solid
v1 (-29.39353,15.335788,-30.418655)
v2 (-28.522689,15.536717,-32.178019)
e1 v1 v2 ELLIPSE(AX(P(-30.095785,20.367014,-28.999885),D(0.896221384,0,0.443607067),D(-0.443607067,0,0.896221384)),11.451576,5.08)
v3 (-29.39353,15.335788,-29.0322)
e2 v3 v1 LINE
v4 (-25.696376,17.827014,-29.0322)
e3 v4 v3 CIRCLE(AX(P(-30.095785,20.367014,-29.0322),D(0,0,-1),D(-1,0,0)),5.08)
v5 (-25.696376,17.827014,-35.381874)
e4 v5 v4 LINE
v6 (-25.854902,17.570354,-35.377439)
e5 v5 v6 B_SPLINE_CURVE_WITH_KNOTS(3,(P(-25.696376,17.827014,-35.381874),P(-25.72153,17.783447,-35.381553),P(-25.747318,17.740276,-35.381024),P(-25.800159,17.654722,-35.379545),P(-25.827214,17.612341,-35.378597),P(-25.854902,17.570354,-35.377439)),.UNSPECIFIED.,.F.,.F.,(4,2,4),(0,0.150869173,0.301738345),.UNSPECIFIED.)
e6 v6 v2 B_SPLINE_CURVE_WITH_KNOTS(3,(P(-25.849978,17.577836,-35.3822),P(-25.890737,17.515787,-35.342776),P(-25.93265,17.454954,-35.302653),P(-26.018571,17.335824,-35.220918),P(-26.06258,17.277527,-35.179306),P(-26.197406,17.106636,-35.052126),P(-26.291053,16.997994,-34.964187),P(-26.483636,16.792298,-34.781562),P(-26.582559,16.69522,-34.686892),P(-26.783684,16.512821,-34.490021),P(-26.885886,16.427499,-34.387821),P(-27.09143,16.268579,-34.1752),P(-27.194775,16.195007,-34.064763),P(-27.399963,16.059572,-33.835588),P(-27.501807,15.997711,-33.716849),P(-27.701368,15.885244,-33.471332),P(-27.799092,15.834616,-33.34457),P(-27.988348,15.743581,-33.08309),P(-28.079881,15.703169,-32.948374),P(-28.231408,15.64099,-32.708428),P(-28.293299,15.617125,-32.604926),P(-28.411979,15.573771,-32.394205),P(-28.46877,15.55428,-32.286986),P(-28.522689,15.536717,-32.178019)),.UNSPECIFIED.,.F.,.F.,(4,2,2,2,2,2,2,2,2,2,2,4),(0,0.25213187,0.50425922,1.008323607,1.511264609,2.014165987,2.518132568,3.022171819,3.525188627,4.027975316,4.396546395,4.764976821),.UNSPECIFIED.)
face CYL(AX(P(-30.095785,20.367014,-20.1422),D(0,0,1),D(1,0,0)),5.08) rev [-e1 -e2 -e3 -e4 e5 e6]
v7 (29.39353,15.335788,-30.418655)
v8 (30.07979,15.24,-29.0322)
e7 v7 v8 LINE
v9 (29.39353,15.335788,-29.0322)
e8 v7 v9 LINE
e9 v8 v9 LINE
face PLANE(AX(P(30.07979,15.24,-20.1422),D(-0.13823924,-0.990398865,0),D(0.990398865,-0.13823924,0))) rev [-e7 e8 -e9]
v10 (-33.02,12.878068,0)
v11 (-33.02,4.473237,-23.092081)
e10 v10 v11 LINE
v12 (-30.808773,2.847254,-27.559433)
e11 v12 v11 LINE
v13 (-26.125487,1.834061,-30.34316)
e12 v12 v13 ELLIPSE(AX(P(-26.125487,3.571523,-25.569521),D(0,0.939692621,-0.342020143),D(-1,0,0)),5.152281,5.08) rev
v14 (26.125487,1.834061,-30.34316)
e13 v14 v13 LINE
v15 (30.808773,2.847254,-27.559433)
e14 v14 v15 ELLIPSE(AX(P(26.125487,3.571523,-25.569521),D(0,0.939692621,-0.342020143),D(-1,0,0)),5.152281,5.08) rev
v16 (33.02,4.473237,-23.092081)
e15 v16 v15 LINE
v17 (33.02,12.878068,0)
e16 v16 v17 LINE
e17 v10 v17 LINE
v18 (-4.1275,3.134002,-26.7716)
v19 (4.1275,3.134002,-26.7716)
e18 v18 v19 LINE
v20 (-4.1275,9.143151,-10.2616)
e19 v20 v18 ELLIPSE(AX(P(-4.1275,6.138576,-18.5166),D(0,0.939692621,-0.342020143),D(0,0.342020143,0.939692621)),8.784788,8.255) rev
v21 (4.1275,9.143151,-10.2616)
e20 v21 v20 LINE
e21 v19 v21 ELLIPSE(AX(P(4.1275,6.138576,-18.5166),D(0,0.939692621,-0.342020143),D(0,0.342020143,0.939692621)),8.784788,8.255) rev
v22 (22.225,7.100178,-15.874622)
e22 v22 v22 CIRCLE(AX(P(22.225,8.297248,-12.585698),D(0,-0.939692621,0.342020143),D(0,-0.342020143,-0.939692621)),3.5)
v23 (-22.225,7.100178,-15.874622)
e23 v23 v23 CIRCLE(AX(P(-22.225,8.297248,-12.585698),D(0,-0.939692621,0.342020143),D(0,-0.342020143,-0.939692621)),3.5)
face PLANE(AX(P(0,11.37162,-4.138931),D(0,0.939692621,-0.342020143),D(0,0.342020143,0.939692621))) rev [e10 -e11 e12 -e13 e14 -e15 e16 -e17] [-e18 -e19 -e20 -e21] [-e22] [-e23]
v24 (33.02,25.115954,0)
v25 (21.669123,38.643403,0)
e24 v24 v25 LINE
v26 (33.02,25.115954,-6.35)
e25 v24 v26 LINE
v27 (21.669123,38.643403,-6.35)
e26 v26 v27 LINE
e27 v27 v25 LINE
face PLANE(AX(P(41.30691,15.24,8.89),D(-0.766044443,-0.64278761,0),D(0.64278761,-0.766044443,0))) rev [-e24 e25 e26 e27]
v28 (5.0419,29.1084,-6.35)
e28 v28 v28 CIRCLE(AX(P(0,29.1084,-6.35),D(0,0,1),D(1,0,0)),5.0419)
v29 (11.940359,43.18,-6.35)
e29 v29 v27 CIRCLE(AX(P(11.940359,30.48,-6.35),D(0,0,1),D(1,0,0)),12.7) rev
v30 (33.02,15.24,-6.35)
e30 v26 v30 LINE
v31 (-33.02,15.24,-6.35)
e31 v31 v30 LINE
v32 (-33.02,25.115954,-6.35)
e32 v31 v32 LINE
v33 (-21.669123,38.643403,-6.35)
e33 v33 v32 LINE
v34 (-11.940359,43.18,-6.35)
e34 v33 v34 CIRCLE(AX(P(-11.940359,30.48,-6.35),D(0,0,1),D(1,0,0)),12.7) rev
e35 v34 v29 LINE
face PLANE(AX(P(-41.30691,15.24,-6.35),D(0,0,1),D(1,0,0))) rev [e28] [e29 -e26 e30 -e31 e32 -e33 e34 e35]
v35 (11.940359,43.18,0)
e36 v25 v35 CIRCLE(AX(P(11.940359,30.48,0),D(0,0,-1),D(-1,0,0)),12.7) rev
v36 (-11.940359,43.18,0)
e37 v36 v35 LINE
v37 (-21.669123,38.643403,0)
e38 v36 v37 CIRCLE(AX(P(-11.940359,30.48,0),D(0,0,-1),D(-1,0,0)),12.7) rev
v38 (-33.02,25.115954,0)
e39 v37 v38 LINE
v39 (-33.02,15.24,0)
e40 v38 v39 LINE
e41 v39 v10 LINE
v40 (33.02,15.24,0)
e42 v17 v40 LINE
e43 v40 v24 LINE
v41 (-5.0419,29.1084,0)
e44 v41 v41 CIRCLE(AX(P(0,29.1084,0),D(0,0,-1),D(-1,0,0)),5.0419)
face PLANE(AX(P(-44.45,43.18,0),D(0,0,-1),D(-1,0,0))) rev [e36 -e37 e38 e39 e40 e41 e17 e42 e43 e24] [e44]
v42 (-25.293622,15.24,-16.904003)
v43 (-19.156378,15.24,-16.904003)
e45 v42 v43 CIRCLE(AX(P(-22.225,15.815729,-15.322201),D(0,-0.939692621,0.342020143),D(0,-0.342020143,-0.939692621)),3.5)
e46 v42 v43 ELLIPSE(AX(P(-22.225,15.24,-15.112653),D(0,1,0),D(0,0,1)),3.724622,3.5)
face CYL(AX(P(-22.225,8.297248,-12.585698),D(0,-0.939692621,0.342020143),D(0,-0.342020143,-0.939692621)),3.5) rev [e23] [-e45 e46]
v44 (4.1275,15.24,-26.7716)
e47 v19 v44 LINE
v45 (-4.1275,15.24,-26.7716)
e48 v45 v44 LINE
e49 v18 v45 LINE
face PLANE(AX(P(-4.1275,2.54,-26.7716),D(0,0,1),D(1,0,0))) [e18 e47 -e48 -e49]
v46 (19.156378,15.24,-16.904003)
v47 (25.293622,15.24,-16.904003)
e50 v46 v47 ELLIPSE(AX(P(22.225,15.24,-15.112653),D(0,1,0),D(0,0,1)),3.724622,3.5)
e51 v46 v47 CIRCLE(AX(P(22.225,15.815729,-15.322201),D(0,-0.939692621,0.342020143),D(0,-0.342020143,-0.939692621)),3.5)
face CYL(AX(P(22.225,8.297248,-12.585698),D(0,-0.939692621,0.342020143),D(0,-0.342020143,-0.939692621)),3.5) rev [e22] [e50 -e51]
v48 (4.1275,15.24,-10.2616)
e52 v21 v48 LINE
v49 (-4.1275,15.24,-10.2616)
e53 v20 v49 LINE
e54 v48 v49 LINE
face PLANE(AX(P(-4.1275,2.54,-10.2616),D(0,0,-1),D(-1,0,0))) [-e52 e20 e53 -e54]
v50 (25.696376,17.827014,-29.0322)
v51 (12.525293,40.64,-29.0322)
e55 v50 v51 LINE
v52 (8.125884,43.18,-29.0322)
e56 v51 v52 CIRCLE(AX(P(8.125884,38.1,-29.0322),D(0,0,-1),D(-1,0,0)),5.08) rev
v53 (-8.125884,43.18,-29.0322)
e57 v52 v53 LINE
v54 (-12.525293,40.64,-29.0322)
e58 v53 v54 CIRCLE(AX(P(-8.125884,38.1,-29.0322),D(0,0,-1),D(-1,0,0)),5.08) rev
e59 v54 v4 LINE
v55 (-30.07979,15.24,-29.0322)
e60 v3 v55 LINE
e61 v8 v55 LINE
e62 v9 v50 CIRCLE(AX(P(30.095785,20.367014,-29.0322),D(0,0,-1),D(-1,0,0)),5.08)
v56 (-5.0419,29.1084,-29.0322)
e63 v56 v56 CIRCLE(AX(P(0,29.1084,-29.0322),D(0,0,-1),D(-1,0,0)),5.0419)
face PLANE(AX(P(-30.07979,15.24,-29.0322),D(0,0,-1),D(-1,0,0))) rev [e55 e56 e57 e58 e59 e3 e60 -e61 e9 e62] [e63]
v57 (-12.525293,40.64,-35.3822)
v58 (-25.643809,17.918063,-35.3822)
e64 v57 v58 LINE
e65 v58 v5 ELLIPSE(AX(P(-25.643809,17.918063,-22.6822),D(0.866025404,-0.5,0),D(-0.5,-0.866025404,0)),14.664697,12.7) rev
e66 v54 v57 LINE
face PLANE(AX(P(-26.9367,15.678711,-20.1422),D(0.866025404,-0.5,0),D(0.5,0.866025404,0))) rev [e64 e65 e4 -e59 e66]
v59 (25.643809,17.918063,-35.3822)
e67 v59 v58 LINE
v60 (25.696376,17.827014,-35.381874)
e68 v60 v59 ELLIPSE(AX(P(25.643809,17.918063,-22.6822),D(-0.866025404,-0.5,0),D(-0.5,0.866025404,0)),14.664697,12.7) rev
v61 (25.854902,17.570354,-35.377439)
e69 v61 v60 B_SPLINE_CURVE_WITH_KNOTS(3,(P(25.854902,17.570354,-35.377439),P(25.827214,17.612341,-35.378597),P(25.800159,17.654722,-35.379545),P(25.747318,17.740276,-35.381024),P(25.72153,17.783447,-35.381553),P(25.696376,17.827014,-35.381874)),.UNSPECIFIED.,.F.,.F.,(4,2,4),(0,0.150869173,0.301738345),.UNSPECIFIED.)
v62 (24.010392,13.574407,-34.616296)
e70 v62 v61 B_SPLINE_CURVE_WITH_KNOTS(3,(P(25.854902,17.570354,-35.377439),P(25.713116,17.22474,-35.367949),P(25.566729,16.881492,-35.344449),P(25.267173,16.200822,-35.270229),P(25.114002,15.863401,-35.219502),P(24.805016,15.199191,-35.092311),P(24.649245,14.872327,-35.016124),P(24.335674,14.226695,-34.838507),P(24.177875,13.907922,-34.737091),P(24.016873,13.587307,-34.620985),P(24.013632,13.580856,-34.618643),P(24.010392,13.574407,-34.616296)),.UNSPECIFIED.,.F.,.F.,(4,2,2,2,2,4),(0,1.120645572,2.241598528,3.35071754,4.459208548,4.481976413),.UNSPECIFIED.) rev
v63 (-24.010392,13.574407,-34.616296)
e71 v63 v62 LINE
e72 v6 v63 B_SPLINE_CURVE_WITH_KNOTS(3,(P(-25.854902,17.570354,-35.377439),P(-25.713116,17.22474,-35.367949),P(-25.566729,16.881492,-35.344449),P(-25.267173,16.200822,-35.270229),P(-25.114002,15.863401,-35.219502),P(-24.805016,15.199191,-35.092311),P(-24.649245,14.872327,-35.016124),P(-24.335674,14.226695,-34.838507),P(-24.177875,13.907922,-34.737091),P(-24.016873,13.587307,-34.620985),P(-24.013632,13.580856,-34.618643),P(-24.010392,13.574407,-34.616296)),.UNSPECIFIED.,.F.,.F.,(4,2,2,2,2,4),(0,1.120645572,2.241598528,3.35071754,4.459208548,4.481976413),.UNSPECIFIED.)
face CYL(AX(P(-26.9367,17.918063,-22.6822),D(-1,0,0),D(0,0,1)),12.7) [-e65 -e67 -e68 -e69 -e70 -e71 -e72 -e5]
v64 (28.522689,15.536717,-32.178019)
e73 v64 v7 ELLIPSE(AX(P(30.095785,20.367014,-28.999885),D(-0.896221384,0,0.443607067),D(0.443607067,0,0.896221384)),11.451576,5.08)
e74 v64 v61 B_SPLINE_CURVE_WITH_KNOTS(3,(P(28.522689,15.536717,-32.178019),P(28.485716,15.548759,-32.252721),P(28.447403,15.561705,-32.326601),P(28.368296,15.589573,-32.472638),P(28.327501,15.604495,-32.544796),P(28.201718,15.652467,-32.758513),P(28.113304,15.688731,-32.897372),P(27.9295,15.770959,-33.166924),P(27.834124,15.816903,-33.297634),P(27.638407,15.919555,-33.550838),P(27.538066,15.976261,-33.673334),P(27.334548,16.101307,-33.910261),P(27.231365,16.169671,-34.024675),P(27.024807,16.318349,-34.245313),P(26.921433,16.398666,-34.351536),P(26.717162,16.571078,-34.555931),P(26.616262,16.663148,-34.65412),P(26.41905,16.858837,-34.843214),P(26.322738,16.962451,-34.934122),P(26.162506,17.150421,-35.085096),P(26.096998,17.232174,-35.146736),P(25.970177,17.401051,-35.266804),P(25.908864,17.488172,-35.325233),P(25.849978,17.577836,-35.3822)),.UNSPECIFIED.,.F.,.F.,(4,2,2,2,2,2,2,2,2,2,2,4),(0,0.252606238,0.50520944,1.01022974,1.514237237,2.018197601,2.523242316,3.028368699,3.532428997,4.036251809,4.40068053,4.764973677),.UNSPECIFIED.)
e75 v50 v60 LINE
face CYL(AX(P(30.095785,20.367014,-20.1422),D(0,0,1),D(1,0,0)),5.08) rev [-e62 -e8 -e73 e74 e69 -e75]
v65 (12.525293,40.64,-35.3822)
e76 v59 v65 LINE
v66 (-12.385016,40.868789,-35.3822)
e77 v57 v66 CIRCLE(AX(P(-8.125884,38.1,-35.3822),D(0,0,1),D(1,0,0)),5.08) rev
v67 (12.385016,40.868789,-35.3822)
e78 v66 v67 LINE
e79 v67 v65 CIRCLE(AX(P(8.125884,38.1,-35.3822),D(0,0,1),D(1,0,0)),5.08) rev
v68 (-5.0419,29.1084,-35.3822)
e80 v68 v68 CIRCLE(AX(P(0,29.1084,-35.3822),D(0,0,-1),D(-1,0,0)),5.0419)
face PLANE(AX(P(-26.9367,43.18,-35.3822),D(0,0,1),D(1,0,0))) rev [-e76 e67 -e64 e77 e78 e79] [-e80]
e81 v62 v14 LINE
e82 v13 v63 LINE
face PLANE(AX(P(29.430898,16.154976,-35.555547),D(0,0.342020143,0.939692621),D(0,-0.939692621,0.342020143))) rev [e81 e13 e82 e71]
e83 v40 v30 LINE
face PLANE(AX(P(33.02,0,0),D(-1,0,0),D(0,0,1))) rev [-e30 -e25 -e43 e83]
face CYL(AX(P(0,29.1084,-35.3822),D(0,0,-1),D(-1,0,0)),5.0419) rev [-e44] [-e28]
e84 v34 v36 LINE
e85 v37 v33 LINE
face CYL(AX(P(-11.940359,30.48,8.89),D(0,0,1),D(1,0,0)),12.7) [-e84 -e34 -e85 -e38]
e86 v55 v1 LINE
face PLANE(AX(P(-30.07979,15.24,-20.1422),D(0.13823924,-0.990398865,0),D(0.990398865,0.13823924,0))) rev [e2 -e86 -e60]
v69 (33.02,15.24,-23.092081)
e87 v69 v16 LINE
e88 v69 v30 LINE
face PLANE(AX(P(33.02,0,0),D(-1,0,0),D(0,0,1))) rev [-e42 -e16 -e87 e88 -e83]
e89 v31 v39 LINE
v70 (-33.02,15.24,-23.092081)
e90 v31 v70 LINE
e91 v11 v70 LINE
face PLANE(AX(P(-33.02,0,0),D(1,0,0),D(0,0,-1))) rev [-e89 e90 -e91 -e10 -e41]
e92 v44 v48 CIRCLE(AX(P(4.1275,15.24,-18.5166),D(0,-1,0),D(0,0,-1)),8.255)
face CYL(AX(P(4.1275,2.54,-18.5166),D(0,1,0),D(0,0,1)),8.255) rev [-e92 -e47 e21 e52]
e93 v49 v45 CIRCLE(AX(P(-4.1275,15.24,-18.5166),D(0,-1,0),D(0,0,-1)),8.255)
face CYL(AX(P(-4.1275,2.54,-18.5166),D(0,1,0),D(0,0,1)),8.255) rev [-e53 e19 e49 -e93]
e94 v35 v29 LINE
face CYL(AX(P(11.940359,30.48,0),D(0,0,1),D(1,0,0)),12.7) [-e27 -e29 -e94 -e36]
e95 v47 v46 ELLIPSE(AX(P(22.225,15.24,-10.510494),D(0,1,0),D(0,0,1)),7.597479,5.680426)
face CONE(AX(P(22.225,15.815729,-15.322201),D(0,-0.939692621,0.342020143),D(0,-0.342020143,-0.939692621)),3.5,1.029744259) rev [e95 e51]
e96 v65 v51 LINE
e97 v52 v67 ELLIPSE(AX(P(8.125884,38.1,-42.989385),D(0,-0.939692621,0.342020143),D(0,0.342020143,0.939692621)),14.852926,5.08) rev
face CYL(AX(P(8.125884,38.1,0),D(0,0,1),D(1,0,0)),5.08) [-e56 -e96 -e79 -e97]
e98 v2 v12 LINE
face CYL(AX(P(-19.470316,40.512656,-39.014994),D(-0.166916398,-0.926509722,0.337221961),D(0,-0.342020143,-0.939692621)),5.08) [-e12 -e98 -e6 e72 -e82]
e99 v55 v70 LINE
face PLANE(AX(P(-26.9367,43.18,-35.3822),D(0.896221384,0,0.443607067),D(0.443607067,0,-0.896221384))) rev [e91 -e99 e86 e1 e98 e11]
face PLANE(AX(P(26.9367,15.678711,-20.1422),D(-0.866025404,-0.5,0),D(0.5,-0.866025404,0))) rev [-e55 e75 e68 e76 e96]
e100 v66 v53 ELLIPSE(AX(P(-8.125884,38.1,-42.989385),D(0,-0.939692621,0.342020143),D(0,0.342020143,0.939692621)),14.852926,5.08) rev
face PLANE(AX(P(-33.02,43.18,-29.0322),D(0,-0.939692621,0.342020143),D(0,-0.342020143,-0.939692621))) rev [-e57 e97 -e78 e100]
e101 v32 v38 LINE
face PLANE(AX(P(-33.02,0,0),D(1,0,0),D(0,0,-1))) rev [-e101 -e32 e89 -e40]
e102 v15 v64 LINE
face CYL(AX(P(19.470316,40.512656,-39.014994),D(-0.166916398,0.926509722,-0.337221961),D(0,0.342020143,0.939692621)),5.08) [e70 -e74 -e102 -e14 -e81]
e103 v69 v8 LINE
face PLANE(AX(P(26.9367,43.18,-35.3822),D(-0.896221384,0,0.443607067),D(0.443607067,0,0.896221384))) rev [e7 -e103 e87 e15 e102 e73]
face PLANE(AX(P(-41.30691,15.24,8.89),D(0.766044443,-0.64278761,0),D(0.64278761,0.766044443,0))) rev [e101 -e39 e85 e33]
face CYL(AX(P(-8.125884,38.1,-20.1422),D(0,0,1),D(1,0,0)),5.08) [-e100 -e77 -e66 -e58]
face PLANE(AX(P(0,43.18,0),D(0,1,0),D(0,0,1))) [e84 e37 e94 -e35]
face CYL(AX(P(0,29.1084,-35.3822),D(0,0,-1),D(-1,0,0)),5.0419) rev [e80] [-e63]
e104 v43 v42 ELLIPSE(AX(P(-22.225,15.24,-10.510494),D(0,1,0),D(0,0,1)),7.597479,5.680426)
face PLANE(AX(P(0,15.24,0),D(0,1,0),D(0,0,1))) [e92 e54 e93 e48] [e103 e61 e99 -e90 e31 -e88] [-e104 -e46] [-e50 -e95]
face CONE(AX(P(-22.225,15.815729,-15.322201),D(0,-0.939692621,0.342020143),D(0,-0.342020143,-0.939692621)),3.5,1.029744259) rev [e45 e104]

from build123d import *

# Parameters (mm, degrees)
BOSS_EXTRUDE1_DEPTH             = 43.18
CUT_EXTRUDE1_DEPTH              = 27.94
SKETCH6_W                       = 92.402659054
SKETCH6_H                       = 40.294164386
CUT_EXTRUDE3_DEPTH              = 25.4
TAP_DRILL_FOR_M8X1_0_TAP1_D     = 7
TAP_DRILL_FOR_M8X1_0_TAP1_DEPTH = 8.001
TAP_DRILL_FOR_M8X1_0_TAP1_TIP   = 2.103012167
CUT_EXTRUDE4_DEPTH              = 12.7
CUT_EXTRUDE5_DEPTH              = 15.24
F_3_8_CLEARANCE_HOLE1_D         = 10.0838
F_3_8_CLEARANCE_HOLE1_DEPTH     = 35.941
F_3_8_CLEARANCE_HOLE1_TIP       = 3.029479155
CUT_EXTRUDE6_DEPTH              = 15.24
CUT_EXTRUDE7_DEPTH              = 15.24
FILLET2_R                       = 12.7
FILLET3_R                       = 5.08
FILLET5_R                       = 5.08
FILLET4_R                       = 12.7
SKETCH16_W                      = 36.875028965
SKETCH16_H                      = 42.723051179
CUT_EXTRUDE8_DEPTH              = 12.7
SKETCH18_W                      = 36.753195168
SKETCH18_H                      = 42.885496241
CUT_EXTRUDE9_DEPTH              = 12.7
CUT_EXTRUDE10_DEPTH             = 65.85933151
CUT_EXTRUDE10_DEPTH_BACK        = 65.85933151


with BuildPart() as part:
    # Sketch1 → Boss-Extrude1 (new body)
    with BuildSketch(Plane(origin=(0, 0, 0), x_dir=(1, 0, 0), z_dir=(0, 1, 0))):
        Polygon((-26.9367, 35.3822), (26.9367, 35.3822), (44.45, 0), (-44.45, 0), align=None)
    extrude(amount=BOSS_EXTRUDE1_DEPTH)

    # Sketch3 → Cut-Extrude1 (cut)
    with BuildSketch(Plane(origin=(0, 43.18, 0), x_dir=(1, 0, 0), z_dir=(0, 1, 0))):
        Polygon((-30.079790452, 29.0322), (30.079790452, 29.0322), (41.306909548, 6.35), (-41.306909548, 6.35), align=None)
    extrude(amount=-CUT_EXTRUDE1_DEPTH, mode=Mode.SUBTRACT)

    # Sketch6 → Cut-Extrude3 (cut)
    with BuildSketch(Plane(origin=(0, 11.371619882, -4.138931152), x_dir=(-1, 0, 0), z_dir=(0, -0.939692620785908, 0.34202014332566977))):
        with Locations((0.08638911, 14.200910291)):
            Rectangle(SKETCH6_W, SKETCH6_H)
    extrude(amount=CUT_EXTRUDE3_DEPTH, mode=Mode.SUBTRACT)

    # Tap Drill for M8x1.0 Tap1
    with Locations(Plane(origin=(0, 11.371619882, -4.138931152), x_dir=(-1, 0, 0), z_dir=(0, -0.939692620785908, 0.3420201433256697))):
        with Locations((22.225, 8.988861466), (-22.225, 8.988861466)):
            Hole(TAP_DRILL_FOR_M8X1_0_TAP1_D / 2, depth=TAP_DRILL_FOR_M8X1_0_TAP1_DEPTH)
            with Locations((0, 0, -(TAP_DRILL_FOR_M8X1_0_TAP1_DEPTH + TAP_DRILL_FOR_M8X1_0_TAP1_TIP / 2))):  # 118° drill point
                Cone(0, TAP_DRILL_FOR_M8X1_0_TAP1_D / 2, TAP_DRILL_FOR_M8X1_0_TAP1_TIP, mode=Mode.SUBTRACT)

    # Sketch10 → Cut-Extrude4 (cut)
    with BuildSketch(Plane(origin=(0, 15.24, -4.821030939), x_dir=(1, 0, 0), z_dir=(0, -1, 0))):
        with BuildLine():
            Line((-4.1275, -5.440569061), (4.1275, -5.440569061))
            ThreePointArc((4.1275, -5.440569061), (12.3825, -13.695569061), (4.1275, -21.950569061))
            Line((4.1275, -21.950569061), (-4.1275, -21.950569061))
            ThreePointArc((-4.1275, -21.950569061), (-12.3825, -13.695569061), (-4.1275, -5.440569061))
        make_face()
    extrude(amount=CUT_EXTRUDE4_DEPTH, mode=Mode.SUBTRACT)

    # Sketch11 → Cut-Extrude5 (cut)
    with BuildSketch(Plane(origin=(0, 11.371619882, -4.138931152), x_dir=(1, 0, 0), z_dir=(0, -0.939692620785908, 0.3420201433256697))):
        Polygon((-26.9367, -33.248392247), (26.9367, -33.248392247), (29.430898409, -27.885957416), (-29.430898409, -27.885957416), align=None)
    extrude(amount=-CUT_EXTRUDE5_DEPTH, mode=Mode.SUBTRACT)

    # 3/8 Clearance Hole1
    with Locations(Plane(origin=(0, 0, -35.3822), x_dir=(-1, 0, 0), z_dir=(0, 0, -1))):
        with Locations((0, 29.1084)):
            Hole(F_3_8_CLEARANCE_HOLE1_D / 2, depth=F_3_8_CLEARANCE_HOLE1_DEPTH)
            with Locations((0, 0, -(F_3_8_CLEARANCE_HOLE1_DEPTH + F_3_8_CLEARANCE_HOLE1_TIP / 2))):  # 118° drill point
                Cone(0, F_3_8_CLEARANCE_HOLE1_D / 2, F_3_8_CLEARANCE_HOLE1_TIP, mode=Mode.SUBTRACT)

    # Sketch14 → Cut-Extrude6 (cut)
    with BuildSketch(Plane(origin=(0, 0, -35.3822), x_dir=(-1, 0, 0), z_dir=(0, 0, -1))):
        Polygon((-26.9367, 15.678710556), (-11.058823136, 43.18), (-30.079790452, 43.18), (-30.079790452, 15.24), align=None)
        Polygon((26.9367, 15.678710556), (11.058823136, 43.18), (30.079790452, 43.18), (30.079790452, 15.24), align=None)
    extrude(amount=-CUT_EXTRUDE6_DEPTH, mode=Mode.SUBTRACT)

    # Sketch15 → Cut-Extrude7 (cut)
    with BuildSketch(Plane(origin=(0, 0, -6.35), x_dir=(-1, 0, 0), z_dir=(0, 0, -1))):
        Polygon((-41.306909548, 15.24), (-17.862465853, 43.18), (-44.45, 43.18), (-44.45, 12.878067623), align=None)
        Polygon((41.306909548, 15.24), (17.862465853, 43.18), (44.45, 43.18), (44.45, 12.878067623), align=None)
    extrude(amount=-CUT_EXTRUDE7_DEPTH, mode=Mode.SUBTRACT)

    # Fillet2
    # the kernel refuses this fillet: 12.7 mm, written as the material it adds along each edge
    with BuildSketch(Plane(origin=(41.306909548, 15.24, -6.35), x_dir=(0.7994362738246867, -0.6007509002018228, 0), z_dir=(0, 0, 1))) as fillet2_piece_1_section:
        with BuildLine():
            CenterArc((FILLET2_R * 0.114610182793, FILLET2_R), FILLET2_R, 256.923695862, 13.076304138)
            Line((-FILLET2_R * 0.111638297241, FILLET2_R * 0.0259303796532), (0, 0))
            Line((0, 0), (FILLET2_R * 0.114610182793, 0))
        make_face()
    fillet2_piece_1 = extrude(amount=6.35, mode=Mode.PRIVATE)
    fillet2_piece_1 = split(fillet2_piece_1, bisect_by=Plane(origin=(42.634214794, 15.269843294, -3.668439147), z_dir=(-0.8962213844521023, 0, 0.4436070671785529)), keep=Keep.TOP, mode=Mode.PRIVATE)
    add(fillet2_piece_1)
    with BuildSketch(Plane(origin=(-41.306909548, 15.24, -6.35), x_dir=(-0.7994362738246867, -0.6007509002018229, 0), z_dir=(0, 0, 1))) as fillet2_piece_2_section:
        with BuildLine():
            CenterArc((FILLET2_R * 0.114610182793, -FILLET2_R), FILLET2_R, 90, 13.076304138)
            Line((-FILLET2_R * 0.111638297241, -FILLET2_R * 0.0259303796532), (0, 0))
            Line((0, 0), (FILLET2_R * 0.114610182793, 0))
        make_face()
    fillet2_piece_2 = extrude(amount=6.35, mode=Mode.PRIVATE)
    fillet2_piece_2 = split(fillet2_piece_2, bisect_by=Plane(origin=(-42.634214794, 15.269843294, -3.668439147), z_dir=(0.8962213844521023, 0, 0.4436070671785529)), keep=Keep.TOP, mode=Mode.PRIVATE)
    add(fillet2_piece_2)
    # the kernel refuses this fillet: 12.7 mm, written as the material it takes off along each edge
    with BuildSketch(Plane(origin=(17.862465853, 43.18, -21.155268146), x_dir=(-1, 0, 0), z_dir=(0, 0, 1)), Plane(origin=(-17.862465853, 43.18, -21.155268146), x_dir=(-0.6427876096865353, -0.7660444431189815, 0), z_dir=(0, 0, 1))) as fillet2_2_piece_1:
        with BuildLine():
            CenterArc((FILLET2_R * 0.466307658155, FILLET2_R), FILLET2_R, 220, 50)
            Line((-FILLET2_R * 0.299736784964, FILLET2_R * 0.357212390313), (0, 0))
            Line((0, 0), (FILLET2_R * 0.466307658155, 0))
        make_face()
    extrude(amount=35.960536293, mode=Mode.SUBTRACT)

    # Fillet3
    # the kernel refuses this fillet: 5.08 mm, written as the material it adds along each edge
    with BuildSketch(Plane(origin=(26.9367, 15.678710556, -35.3822), x_dir=(0.9903988653234791, -0.1382392403262007, 0), z_dir=(0, 0, 1))) as fillet3_piece_1_section:
        with BuildLine():
            CenterArc((FILLET3_R * 0.488316369793, FILLET3_R), FILLET3_R, 217.945971462, 52.054028538)
            Line((-FILLET3_R * 0.300274587293, FILLET3_R * 0.385081873416), (0, 0))
            Line((0, 0), (FILLET3_R * 0.488316369793, 0))
        make_face()
    fillet3_piece_1 = extrude(amount=6.35, mode=Mode.PRIVATE)
    fillet3_piece_1 = split(fillet3_piece_1, bisect_by=Plane(origin=(28.34322893, 16.154895704, -32.540583178), z_dir=(-0.8962213844519045, 0, 0.4436070671789527)), keep=Keep.TOP, mode=Mode.PRIVATE)
    add(fillet3_piece_1)
    with BuildSketch(Plane(origin=(-26.9367, 15.678710556, -35.3822), x_dir=(-0.9903988653234792, -0.13823924032619928, 0), z_dir=(0, 0, 1))) as fillet3_piece_2_section:
        with BuildLine():
            CenterArc((FILLET3_R * 0.488316369793, -FILLET3_R), FILLET3_R, 90, 52.054028538)
            Line((-FILLET3_R * 0.300274587293, -FILLET3_R * 0.385081873416), (0, 0))
            Line((0, 0), (FILLET3_R * 0.488316369793, 0))
        make_face()
    fillet3_piece_2 = extrude(amount=6.35, mode=Mode.PRIVATE)
    fillet3_piece_2 = split(fillet3_piece_2, bisect_by=Plane(origin=(-28.34322893, 16.154895704, -32.540583178), z_dir=(0.8962213844519045, 0, 0.4436070671789527)), keep=Keep.TOP, mode=Mode.PRIVATE)
    add(fillet3_piece_2)
    # the kernel refuses this fillet: 5.08 mm, written as the material it takes off along each edge
    with BuildSketch(Plane(origin=(11.058823136, 43.18, -42.714548419), x_dir=(0.49999999999999484, -0.8660254037844416, 0), z_dir=(0, 0, 1)), Plane(origin=(-11.058823136, 43.18, -42.714548419), x_dir=(1, 0, 0), z_dir=(0, 0, 1))) as fillet3_2_piece_1:
        with BuildLine():
            CenterArc((FILLET3_R * 0.57735026919, -FILLET3_R), FILLET3_R, 90, 60)
            Line((-FILLET3_R * 0.288675134595, -FILLET3_R * 0.5), (0, 0))
            Line((0, 0), (FILLET3_R * 0.57735026919, 0))
        make_face()
    extrude(amount=21.014696837, mode=Mode.SUBTRACT)

    # Fillet5
    fillet5_edges = [part.edges().sort_by_distance(p)[0] for p in [
        (28.183799204, 8.756385643, -32.86267978),
        (-28.183799204, 8.756385643, -32.86267978),
    ]]
    fillet(fillet5_edges, radius=FILLET5_R)

    # Fillet4
    # the kernel refuses this fillet: 12.7 mm, written as the material it takes off along each edge
    with BuildSketch(Plane(origin=(-29.229670418, 15.678710556, -35.3822), x_dir=(0, 1, 0), z_dir=(1, 0, 0))) as fillet4_piece_1:
        with BuildLine():
            CenterArc((FILLET4_R * 0.176326980708, FILLET4_R), FILLET4_R, 250, 20)
            Line((-FILLET4_R * 0.165693162617, FILLET4_R * 0.0603073792141), (0, 0))
            Line((0, 0), (FILLET4_R * 0.176326980708, 0))
        make_face()
    extrude(amount=58.459340836, mode=Mode.SUBTRACT)

    # Sketch16 → Cut-Extrude8 (cut)
    with BuildSketch(Plane(origin=(-45.72, 0, 0), x_dir=(0, 0, -1), z_dir=(1, 0, 0))):
        with Locations((17.528654939, 22.385196569)):
            Rectangle(SKETCH16_W, SKETCH16_H)
    extrude(amount=CUT_EXTRUDE8_DEPTH, mode=Mode.SUBTRACT)

    # Sketch18 → Cut-Extrude9 (cut)
    with BuildSketch(Plane.ZY.offset(-45.72)):
        with Locations((-17.752016898, 22.669475427)):
            Rectangle(SKETCH18_W, SKETCH18_H)
    extrude(amount=CUT_EXTRUDE9_DEPTH, mode=Mode.SUBTRACT)

    # Sketch19 → Cut-Extrude10 (cut, two sides: drawn at the far end of the back side and taken through both)
    with BuildSketch(Plane(origin=(0, 0, 0), x_dir=(0, 0, -1), z_dir=(1, 0, 0)).offset(-CUT_EXTRUDE10_DEPTH_BACK)):
        Polygon((29.0322, 43.18), (35.3822, 40.868789012), (35.3822, 43.18), align=None)
    extrude(amount=CUT_EXTRUDE10_DEPTH + CUT_EXTRUDE10_DEPTH_BACK, mode=Mode.SUBTRACT)


solid = part.part
